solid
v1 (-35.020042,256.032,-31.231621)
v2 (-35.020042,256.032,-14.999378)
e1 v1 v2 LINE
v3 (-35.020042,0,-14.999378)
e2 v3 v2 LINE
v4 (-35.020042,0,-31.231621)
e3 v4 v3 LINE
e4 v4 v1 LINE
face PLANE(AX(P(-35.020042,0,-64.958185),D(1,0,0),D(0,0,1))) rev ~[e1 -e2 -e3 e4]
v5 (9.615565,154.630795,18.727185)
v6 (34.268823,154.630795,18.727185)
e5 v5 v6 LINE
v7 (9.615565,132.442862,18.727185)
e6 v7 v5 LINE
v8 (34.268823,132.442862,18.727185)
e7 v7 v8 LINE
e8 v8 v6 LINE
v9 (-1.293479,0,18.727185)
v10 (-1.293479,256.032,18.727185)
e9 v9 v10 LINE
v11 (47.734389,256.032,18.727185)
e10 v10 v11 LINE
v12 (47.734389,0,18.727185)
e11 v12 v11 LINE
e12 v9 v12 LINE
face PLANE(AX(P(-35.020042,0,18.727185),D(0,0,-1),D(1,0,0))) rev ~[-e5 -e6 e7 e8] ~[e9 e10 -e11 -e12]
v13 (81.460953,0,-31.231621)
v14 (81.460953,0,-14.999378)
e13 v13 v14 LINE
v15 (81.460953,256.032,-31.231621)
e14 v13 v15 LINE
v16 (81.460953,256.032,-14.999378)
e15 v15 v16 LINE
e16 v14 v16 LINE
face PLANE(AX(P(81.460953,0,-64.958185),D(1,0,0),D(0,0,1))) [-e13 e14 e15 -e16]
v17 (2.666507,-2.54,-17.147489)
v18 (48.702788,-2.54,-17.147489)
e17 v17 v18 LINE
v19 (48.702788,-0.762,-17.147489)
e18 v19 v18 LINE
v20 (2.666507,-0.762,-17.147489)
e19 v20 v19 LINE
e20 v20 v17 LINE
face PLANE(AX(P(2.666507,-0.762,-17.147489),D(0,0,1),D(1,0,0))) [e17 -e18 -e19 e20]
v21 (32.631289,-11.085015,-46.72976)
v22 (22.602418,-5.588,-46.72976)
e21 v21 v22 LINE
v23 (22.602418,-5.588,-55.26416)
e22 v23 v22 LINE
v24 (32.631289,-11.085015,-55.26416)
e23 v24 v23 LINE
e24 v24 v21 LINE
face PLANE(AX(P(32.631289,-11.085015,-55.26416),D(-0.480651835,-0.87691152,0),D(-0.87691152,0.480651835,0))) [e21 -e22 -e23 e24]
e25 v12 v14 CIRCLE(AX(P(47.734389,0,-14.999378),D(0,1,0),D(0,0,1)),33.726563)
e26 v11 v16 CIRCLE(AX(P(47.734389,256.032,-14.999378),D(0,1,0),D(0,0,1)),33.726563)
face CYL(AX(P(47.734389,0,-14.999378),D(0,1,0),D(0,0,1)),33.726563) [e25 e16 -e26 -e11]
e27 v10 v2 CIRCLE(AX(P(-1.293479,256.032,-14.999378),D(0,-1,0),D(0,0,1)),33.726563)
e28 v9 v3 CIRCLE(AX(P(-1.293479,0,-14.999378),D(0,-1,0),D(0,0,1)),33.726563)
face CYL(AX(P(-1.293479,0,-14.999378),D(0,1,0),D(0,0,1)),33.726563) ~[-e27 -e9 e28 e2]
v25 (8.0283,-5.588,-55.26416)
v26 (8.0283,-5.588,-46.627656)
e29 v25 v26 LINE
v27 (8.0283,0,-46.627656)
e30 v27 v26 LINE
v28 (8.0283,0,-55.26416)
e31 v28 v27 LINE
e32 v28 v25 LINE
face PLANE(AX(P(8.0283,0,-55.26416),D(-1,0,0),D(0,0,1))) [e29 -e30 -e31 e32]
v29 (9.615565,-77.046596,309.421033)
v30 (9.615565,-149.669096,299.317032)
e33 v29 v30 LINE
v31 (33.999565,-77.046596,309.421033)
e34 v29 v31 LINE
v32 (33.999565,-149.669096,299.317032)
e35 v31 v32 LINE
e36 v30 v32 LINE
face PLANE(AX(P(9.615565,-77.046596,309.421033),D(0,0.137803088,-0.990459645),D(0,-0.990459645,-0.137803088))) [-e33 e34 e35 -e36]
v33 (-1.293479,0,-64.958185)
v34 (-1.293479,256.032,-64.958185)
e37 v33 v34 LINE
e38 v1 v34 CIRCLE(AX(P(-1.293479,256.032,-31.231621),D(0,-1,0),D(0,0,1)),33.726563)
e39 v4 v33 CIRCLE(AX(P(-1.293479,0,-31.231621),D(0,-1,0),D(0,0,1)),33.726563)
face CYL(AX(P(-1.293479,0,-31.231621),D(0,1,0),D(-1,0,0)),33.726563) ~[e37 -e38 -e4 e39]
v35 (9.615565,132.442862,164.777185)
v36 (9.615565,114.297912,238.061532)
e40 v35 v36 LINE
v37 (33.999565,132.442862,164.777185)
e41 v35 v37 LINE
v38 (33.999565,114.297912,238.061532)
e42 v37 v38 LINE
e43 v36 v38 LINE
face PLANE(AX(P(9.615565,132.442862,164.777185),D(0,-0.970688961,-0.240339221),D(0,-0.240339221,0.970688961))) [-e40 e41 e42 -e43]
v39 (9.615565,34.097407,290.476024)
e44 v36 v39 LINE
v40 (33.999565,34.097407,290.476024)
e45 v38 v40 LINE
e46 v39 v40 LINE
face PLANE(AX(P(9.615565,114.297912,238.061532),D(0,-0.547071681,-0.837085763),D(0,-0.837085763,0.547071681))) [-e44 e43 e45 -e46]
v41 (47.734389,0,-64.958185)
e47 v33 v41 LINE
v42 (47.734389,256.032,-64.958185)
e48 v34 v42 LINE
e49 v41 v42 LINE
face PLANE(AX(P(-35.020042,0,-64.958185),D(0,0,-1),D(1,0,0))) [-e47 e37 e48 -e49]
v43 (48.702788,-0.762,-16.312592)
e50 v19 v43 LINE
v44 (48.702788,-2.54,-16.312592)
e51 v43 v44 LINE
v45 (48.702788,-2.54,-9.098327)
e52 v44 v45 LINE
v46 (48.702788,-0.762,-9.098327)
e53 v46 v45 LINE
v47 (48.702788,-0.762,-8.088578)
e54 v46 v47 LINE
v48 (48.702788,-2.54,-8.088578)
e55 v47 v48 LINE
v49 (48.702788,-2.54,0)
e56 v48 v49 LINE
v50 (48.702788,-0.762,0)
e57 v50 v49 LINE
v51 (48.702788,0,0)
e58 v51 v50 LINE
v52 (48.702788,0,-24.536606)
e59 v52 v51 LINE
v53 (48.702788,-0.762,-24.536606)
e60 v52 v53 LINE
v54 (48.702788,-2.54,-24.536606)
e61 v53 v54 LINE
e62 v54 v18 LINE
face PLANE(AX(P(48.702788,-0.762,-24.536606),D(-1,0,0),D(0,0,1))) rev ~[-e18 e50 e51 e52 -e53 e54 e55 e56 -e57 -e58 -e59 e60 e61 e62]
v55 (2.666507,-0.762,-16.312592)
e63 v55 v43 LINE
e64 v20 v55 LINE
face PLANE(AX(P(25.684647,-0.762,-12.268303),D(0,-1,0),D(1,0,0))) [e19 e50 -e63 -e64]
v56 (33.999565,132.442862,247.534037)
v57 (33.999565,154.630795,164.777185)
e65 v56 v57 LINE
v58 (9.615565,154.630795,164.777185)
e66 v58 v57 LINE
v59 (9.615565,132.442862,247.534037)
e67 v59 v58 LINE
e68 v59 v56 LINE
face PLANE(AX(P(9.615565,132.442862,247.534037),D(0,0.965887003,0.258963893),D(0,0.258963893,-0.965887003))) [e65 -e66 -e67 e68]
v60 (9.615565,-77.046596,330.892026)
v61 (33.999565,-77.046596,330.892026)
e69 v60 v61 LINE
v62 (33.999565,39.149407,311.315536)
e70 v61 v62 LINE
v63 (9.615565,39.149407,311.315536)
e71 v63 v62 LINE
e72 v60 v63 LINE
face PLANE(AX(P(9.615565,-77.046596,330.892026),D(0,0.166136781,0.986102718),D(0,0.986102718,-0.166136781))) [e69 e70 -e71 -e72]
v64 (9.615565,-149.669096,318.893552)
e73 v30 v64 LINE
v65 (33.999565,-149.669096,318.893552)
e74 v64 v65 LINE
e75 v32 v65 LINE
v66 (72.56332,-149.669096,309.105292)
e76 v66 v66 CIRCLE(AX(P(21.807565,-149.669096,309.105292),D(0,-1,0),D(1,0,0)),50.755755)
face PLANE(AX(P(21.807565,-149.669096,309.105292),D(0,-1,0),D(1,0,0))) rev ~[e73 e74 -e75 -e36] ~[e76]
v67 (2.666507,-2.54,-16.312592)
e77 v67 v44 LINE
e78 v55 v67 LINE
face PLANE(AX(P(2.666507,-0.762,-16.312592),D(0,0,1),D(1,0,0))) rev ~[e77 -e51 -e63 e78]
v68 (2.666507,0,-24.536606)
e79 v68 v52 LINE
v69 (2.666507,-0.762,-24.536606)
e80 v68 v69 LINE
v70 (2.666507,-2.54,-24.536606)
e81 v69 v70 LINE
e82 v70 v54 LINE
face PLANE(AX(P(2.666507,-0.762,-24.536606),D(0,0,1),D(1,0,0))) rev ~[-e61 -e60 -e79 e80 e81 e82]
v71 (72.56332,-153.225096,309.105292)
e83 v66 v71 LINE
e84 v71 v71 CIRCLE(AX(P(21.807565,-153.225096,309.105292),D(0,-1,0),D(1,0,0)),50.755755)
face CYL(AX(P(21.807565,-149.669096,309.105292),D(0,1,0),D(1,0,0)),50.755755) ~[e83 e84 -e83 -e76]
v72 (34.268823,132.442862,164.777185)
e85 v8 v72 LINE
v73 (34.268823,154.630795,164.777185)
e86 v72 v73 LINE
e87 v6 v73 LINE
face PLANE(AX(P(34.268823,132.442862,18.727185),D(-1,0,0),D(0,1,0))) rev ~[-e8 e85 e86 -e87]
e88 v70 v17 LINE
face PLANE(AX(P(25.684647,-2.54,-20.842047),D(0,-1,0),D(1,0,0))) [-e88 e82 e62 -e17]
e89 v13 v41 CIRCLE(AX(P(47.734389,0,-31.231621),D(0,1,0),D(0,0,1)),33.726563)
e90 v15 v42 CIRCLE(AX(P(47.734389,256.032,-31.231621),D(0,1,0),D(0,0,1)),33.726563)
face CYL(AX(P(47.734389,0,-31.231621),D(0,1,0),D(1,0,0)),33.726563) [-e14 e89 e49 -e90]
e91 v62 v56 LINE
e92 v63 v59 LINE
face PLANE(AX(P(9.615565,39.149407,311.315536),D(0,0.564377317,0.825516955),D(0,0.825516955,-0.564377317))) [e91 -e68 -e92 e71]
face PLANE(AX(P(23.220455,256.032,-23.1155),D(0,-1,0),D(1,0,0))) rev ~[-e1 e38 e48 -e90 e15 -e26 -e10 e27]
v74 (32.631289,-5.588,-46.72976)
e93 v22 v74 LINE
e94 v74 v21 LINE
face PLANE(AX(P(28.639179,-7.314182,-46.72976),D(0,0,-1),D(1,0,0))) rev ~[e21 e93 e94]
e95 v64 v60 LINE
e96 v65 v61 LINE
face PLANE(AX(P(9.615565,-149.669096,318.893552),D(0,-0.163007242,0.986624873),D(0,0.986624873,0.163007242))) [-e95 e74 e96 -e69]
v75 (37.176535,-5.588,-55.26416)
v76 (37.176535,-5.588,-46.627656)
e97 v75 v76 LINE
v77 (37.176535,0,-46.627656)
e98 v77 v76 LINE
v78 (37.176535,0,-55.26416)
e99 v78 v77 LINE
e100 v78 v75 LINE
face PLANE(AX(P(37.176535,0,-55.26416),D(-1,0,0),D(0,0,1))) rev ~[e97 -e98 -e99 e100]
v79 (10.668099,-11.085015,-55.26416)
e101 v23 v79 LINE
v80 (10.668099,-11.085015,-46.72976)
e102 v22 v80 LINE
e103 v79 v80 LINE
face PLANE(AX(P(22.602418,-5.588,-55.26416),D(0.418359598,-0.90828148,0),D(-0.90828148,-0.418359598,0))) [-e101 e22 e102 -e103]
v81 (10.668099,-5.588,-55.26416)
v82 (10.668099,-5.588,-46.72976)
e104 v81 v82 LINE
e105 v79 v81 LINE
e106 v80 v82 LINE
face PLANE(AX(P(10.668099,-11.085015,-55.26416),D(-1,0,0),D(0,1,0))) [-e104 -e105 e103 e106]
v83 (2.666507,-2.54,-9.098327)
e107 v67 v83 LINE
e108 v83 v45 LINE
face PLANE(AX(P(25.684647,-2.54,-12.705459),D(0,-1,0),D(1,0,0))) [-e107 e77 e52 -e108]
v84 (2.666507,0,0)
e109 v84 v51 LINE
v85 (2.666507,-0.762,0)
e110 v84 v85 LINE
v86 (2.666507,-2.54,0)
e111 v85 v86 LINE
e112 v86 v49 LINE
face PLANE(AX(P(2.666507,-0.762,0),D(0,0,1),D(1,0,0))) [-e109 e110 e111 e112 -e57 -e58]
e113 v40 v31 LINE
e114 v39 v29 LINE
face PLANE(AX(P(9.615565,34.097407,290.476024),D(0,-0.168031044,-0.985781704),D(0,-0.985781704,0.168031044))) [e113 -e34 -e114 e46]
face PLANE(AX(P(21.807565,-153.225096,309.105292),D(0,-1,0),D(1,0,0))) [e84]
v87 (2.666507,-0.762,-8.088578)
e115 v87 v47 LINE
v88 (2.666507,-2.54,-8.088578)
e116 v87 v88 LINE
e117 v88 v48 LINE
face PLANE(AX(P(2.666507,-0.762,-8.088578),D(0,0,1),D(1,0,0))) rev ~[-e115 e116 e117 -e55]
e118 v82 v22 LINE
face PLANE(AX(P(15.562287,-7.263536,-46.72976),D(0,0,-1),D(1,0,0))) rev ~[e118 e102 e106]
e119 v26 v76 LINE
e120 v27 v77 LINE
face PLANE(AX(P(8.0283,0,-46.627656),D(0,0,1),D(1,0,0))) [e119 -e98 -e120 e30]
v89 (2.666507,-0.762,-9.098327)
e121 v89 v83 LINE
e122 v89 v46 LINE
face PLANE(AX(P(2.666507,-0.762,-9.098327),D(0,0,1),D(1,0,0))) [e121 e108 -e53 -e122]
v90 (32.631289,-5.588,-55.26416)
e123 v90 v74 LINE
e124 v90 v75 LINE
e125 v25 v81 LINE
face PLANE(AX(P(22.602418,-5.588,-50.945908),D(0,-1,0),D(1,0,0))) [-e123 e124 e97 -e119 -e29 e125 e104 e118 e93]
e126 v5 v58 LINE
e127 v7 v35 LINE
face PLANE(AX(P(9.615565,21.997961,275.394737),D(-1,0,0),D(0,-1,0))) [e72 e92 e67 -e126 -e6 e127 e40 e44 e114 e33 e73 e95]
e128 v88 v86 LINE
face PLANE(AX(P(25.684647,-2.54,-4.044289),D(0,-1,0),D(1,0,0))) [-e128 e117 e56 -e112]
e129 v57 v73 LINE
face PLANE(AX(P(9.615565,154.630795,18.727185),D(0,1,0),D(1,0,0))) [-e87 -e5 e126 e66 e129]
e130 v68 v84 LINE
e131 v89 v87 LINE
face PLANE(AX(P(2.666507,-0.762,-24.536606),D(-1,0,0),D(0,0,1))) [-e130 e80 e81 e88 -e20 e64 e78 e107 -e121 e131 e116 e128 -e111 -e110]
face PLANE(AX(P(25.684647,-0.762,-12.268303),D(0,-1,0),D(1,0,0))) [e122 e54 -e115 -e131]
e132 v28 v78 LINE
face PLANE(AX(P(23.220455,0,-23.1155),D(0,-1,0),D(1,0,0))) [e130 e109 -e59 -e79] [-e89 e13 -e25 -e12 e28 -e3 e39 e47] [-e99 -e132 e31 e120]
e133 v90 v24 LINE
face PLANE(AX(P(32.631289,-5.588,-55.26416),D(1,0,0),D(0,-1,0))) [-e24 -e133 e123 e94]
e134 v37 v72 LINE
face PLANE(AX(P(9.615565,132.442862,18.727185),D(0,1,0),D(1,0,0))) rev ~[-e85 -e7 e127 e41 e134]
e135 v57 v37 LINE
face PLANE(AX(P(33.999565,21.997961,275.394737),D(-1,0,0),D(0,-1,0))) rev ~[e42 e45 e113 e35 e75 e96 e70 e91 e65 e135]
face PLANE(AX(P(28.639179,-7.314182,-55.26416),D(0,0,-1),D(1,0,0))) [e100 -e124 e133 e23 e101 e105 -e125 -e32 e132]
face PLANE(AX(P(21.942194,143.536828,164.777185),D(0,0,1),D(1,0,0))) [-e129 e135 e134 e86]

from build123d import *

# Parameters (mm, degrees)
F0_W      = 116.4809949696
F0_H      = 83.6853701621
F1_DEPTH  = 256.032
F2_W      = 24.6532578021
F2_H      = 22.1879333258
F3_DEPTH  = 146.05
F5_DEPTH  = 24.384
F6_R      = 33.7265634664
F9_R      = 50.7557548826
F10_DEPTH = 3.556
F11_W     = 29.1482340544
F11_H     = 8.6365044117
F12_DEPTH = 5.588
F14_DEPTH = 8.5344
F15_W     = 46.036280226
F15_H     = 24.5366059244
F16_DEPTH = 0.762
F17_W     = 46.036280226
F17_H     = 8.0885775387
F18_DEPTH = 1.778
F19_W     = 46.036280226
F19_H     = 7.2142649442
F20_DEPTH = 1.778
F21_W     = 46.036280226
F21_H     = 7.3891170323
F22_DEPTH = 1.778


# Not quite as in the source:
# - the program builds the solid bodies; features that only make, move or delete a surface that nothing else refers to are left out


with BuildPart() as f1:
    # F0 (on Front) → F1 (new body)
    with BuildSketch(Plane.XZ):
        with Locations((23.220455274, -23.1154998764)):
            Rectangle(F0_W, F0_H)
    extrude(amount=-F1_DEPTH)

    # F2 (on face) → F3 (join)
    with BuildSketch(Plane.XY.offset(18.7271852046)):
        with Locations((21.9421936199, 143.5368284583)):
            Rectangle(F2_W, F2_H)
    extrude(amount=F3_DEPTH)

    # F4 (on face) → F5 (join)
    with BuildSketch(Plane(origin=(9.6155647188, 0, 0), x_dir=(0, -1, 0), z_dir=(-1, 0, 0))):
        Polygon((-132.4428617954, 247.5340366364), (-154.6307951212, 164.7771852046), (-132.4428617954, 164.7771852046), (-114.2979115248, 238.0615323782), (-34.0974070132, 290.4760241508), (77.0465955138, 309.4210326672), (149.6690958738, 299.3170320988), (149.6690958738, 318.8935518265), (77.0465955138, 330.8920264244), (-39.1494072974, 311.315536499), align=None)
    extrude(amount=-F5_DEPTH)

    # F6
    f6_edges = [f1.edges().sort_by_distance(p)[0] for p in [
        (-35.020042, 128.016, 18.727185),
        (81.460953, 128.016, 18.727185),
        (-35.020042, 128.016, -64.958185),
        (81.460953, 128.016, -64.958185),
    ]]
    fillet(f6_edges, radius=F6_R)

    # F9 (on face) → F10 (join)
    with BuildSketch(Plane.XZ.offset(149.6690958738)):
        with Locations((21.8075647188, 309.1052919626)):
            Circle(F9_R)
    extrude(amount=F10_DEPTH)

    # F11 (on face) → F12 (join)
    with BuildSketch(Plane.XZ):
        with Locations((22.6024175063, -50.9459078312)):
            Rectangle(F11_W, F11_H)
    extrude(amount=F12_DEPTH)

    # F13 (on face) → F14 (join)
    with BuildSketch(Plane(origin=(0, 0, -55.264160037), x_dir=(1, 0, 0), z_dir=(0, 0, -1))):
        Polygon((32.6312892139, 11.0850147903), (22.6024175063, 5.588), (32.6312892139, 5.588), align=None)
        Polygon((10.6680989265, 11.0850147903), (10.6680989265, 5.588), (22.6024175063, 5.588), align=None)
    extrude(amount=-F14_DEPTH)

    # F15 (on face) → F16 (join)
    with BuildSketch(Plane.XZ):
        with Locations((25.6846474949, -12.2683029622)):
            Rectangle(F15_W, F15_H)
    extrude(amount=F16_DEPTH)

    # F17 (on face) → F18 (join)
    with BuildSketch(Plane.XZ.offset(0.762)):
        with Locations((25.6846474949, -4.0442887694)):
            Rectangle(F17_W, F17_H)
    extrude(amount=F18_DEPTH)

    # F19 (on face) → F20 (join)
    with BuildSketch(Plane.XZ.offset(0.762)):
        with Locations((25.6846474949, -12.7054592595)):
            Rectangle(F19_W, F19_H)
    extrude(amount=F20_DEPTH)

    # F21 (on face) → F22 (join)
    with BuildSketch(Plane.XZ.offset(0.762)):
        with Locations((25.6846474949, -20.8420474082)):
            Rectangle(F21_W, F21_H)
    extrude(amount=F22_DEPTH)


solid = f1.part
